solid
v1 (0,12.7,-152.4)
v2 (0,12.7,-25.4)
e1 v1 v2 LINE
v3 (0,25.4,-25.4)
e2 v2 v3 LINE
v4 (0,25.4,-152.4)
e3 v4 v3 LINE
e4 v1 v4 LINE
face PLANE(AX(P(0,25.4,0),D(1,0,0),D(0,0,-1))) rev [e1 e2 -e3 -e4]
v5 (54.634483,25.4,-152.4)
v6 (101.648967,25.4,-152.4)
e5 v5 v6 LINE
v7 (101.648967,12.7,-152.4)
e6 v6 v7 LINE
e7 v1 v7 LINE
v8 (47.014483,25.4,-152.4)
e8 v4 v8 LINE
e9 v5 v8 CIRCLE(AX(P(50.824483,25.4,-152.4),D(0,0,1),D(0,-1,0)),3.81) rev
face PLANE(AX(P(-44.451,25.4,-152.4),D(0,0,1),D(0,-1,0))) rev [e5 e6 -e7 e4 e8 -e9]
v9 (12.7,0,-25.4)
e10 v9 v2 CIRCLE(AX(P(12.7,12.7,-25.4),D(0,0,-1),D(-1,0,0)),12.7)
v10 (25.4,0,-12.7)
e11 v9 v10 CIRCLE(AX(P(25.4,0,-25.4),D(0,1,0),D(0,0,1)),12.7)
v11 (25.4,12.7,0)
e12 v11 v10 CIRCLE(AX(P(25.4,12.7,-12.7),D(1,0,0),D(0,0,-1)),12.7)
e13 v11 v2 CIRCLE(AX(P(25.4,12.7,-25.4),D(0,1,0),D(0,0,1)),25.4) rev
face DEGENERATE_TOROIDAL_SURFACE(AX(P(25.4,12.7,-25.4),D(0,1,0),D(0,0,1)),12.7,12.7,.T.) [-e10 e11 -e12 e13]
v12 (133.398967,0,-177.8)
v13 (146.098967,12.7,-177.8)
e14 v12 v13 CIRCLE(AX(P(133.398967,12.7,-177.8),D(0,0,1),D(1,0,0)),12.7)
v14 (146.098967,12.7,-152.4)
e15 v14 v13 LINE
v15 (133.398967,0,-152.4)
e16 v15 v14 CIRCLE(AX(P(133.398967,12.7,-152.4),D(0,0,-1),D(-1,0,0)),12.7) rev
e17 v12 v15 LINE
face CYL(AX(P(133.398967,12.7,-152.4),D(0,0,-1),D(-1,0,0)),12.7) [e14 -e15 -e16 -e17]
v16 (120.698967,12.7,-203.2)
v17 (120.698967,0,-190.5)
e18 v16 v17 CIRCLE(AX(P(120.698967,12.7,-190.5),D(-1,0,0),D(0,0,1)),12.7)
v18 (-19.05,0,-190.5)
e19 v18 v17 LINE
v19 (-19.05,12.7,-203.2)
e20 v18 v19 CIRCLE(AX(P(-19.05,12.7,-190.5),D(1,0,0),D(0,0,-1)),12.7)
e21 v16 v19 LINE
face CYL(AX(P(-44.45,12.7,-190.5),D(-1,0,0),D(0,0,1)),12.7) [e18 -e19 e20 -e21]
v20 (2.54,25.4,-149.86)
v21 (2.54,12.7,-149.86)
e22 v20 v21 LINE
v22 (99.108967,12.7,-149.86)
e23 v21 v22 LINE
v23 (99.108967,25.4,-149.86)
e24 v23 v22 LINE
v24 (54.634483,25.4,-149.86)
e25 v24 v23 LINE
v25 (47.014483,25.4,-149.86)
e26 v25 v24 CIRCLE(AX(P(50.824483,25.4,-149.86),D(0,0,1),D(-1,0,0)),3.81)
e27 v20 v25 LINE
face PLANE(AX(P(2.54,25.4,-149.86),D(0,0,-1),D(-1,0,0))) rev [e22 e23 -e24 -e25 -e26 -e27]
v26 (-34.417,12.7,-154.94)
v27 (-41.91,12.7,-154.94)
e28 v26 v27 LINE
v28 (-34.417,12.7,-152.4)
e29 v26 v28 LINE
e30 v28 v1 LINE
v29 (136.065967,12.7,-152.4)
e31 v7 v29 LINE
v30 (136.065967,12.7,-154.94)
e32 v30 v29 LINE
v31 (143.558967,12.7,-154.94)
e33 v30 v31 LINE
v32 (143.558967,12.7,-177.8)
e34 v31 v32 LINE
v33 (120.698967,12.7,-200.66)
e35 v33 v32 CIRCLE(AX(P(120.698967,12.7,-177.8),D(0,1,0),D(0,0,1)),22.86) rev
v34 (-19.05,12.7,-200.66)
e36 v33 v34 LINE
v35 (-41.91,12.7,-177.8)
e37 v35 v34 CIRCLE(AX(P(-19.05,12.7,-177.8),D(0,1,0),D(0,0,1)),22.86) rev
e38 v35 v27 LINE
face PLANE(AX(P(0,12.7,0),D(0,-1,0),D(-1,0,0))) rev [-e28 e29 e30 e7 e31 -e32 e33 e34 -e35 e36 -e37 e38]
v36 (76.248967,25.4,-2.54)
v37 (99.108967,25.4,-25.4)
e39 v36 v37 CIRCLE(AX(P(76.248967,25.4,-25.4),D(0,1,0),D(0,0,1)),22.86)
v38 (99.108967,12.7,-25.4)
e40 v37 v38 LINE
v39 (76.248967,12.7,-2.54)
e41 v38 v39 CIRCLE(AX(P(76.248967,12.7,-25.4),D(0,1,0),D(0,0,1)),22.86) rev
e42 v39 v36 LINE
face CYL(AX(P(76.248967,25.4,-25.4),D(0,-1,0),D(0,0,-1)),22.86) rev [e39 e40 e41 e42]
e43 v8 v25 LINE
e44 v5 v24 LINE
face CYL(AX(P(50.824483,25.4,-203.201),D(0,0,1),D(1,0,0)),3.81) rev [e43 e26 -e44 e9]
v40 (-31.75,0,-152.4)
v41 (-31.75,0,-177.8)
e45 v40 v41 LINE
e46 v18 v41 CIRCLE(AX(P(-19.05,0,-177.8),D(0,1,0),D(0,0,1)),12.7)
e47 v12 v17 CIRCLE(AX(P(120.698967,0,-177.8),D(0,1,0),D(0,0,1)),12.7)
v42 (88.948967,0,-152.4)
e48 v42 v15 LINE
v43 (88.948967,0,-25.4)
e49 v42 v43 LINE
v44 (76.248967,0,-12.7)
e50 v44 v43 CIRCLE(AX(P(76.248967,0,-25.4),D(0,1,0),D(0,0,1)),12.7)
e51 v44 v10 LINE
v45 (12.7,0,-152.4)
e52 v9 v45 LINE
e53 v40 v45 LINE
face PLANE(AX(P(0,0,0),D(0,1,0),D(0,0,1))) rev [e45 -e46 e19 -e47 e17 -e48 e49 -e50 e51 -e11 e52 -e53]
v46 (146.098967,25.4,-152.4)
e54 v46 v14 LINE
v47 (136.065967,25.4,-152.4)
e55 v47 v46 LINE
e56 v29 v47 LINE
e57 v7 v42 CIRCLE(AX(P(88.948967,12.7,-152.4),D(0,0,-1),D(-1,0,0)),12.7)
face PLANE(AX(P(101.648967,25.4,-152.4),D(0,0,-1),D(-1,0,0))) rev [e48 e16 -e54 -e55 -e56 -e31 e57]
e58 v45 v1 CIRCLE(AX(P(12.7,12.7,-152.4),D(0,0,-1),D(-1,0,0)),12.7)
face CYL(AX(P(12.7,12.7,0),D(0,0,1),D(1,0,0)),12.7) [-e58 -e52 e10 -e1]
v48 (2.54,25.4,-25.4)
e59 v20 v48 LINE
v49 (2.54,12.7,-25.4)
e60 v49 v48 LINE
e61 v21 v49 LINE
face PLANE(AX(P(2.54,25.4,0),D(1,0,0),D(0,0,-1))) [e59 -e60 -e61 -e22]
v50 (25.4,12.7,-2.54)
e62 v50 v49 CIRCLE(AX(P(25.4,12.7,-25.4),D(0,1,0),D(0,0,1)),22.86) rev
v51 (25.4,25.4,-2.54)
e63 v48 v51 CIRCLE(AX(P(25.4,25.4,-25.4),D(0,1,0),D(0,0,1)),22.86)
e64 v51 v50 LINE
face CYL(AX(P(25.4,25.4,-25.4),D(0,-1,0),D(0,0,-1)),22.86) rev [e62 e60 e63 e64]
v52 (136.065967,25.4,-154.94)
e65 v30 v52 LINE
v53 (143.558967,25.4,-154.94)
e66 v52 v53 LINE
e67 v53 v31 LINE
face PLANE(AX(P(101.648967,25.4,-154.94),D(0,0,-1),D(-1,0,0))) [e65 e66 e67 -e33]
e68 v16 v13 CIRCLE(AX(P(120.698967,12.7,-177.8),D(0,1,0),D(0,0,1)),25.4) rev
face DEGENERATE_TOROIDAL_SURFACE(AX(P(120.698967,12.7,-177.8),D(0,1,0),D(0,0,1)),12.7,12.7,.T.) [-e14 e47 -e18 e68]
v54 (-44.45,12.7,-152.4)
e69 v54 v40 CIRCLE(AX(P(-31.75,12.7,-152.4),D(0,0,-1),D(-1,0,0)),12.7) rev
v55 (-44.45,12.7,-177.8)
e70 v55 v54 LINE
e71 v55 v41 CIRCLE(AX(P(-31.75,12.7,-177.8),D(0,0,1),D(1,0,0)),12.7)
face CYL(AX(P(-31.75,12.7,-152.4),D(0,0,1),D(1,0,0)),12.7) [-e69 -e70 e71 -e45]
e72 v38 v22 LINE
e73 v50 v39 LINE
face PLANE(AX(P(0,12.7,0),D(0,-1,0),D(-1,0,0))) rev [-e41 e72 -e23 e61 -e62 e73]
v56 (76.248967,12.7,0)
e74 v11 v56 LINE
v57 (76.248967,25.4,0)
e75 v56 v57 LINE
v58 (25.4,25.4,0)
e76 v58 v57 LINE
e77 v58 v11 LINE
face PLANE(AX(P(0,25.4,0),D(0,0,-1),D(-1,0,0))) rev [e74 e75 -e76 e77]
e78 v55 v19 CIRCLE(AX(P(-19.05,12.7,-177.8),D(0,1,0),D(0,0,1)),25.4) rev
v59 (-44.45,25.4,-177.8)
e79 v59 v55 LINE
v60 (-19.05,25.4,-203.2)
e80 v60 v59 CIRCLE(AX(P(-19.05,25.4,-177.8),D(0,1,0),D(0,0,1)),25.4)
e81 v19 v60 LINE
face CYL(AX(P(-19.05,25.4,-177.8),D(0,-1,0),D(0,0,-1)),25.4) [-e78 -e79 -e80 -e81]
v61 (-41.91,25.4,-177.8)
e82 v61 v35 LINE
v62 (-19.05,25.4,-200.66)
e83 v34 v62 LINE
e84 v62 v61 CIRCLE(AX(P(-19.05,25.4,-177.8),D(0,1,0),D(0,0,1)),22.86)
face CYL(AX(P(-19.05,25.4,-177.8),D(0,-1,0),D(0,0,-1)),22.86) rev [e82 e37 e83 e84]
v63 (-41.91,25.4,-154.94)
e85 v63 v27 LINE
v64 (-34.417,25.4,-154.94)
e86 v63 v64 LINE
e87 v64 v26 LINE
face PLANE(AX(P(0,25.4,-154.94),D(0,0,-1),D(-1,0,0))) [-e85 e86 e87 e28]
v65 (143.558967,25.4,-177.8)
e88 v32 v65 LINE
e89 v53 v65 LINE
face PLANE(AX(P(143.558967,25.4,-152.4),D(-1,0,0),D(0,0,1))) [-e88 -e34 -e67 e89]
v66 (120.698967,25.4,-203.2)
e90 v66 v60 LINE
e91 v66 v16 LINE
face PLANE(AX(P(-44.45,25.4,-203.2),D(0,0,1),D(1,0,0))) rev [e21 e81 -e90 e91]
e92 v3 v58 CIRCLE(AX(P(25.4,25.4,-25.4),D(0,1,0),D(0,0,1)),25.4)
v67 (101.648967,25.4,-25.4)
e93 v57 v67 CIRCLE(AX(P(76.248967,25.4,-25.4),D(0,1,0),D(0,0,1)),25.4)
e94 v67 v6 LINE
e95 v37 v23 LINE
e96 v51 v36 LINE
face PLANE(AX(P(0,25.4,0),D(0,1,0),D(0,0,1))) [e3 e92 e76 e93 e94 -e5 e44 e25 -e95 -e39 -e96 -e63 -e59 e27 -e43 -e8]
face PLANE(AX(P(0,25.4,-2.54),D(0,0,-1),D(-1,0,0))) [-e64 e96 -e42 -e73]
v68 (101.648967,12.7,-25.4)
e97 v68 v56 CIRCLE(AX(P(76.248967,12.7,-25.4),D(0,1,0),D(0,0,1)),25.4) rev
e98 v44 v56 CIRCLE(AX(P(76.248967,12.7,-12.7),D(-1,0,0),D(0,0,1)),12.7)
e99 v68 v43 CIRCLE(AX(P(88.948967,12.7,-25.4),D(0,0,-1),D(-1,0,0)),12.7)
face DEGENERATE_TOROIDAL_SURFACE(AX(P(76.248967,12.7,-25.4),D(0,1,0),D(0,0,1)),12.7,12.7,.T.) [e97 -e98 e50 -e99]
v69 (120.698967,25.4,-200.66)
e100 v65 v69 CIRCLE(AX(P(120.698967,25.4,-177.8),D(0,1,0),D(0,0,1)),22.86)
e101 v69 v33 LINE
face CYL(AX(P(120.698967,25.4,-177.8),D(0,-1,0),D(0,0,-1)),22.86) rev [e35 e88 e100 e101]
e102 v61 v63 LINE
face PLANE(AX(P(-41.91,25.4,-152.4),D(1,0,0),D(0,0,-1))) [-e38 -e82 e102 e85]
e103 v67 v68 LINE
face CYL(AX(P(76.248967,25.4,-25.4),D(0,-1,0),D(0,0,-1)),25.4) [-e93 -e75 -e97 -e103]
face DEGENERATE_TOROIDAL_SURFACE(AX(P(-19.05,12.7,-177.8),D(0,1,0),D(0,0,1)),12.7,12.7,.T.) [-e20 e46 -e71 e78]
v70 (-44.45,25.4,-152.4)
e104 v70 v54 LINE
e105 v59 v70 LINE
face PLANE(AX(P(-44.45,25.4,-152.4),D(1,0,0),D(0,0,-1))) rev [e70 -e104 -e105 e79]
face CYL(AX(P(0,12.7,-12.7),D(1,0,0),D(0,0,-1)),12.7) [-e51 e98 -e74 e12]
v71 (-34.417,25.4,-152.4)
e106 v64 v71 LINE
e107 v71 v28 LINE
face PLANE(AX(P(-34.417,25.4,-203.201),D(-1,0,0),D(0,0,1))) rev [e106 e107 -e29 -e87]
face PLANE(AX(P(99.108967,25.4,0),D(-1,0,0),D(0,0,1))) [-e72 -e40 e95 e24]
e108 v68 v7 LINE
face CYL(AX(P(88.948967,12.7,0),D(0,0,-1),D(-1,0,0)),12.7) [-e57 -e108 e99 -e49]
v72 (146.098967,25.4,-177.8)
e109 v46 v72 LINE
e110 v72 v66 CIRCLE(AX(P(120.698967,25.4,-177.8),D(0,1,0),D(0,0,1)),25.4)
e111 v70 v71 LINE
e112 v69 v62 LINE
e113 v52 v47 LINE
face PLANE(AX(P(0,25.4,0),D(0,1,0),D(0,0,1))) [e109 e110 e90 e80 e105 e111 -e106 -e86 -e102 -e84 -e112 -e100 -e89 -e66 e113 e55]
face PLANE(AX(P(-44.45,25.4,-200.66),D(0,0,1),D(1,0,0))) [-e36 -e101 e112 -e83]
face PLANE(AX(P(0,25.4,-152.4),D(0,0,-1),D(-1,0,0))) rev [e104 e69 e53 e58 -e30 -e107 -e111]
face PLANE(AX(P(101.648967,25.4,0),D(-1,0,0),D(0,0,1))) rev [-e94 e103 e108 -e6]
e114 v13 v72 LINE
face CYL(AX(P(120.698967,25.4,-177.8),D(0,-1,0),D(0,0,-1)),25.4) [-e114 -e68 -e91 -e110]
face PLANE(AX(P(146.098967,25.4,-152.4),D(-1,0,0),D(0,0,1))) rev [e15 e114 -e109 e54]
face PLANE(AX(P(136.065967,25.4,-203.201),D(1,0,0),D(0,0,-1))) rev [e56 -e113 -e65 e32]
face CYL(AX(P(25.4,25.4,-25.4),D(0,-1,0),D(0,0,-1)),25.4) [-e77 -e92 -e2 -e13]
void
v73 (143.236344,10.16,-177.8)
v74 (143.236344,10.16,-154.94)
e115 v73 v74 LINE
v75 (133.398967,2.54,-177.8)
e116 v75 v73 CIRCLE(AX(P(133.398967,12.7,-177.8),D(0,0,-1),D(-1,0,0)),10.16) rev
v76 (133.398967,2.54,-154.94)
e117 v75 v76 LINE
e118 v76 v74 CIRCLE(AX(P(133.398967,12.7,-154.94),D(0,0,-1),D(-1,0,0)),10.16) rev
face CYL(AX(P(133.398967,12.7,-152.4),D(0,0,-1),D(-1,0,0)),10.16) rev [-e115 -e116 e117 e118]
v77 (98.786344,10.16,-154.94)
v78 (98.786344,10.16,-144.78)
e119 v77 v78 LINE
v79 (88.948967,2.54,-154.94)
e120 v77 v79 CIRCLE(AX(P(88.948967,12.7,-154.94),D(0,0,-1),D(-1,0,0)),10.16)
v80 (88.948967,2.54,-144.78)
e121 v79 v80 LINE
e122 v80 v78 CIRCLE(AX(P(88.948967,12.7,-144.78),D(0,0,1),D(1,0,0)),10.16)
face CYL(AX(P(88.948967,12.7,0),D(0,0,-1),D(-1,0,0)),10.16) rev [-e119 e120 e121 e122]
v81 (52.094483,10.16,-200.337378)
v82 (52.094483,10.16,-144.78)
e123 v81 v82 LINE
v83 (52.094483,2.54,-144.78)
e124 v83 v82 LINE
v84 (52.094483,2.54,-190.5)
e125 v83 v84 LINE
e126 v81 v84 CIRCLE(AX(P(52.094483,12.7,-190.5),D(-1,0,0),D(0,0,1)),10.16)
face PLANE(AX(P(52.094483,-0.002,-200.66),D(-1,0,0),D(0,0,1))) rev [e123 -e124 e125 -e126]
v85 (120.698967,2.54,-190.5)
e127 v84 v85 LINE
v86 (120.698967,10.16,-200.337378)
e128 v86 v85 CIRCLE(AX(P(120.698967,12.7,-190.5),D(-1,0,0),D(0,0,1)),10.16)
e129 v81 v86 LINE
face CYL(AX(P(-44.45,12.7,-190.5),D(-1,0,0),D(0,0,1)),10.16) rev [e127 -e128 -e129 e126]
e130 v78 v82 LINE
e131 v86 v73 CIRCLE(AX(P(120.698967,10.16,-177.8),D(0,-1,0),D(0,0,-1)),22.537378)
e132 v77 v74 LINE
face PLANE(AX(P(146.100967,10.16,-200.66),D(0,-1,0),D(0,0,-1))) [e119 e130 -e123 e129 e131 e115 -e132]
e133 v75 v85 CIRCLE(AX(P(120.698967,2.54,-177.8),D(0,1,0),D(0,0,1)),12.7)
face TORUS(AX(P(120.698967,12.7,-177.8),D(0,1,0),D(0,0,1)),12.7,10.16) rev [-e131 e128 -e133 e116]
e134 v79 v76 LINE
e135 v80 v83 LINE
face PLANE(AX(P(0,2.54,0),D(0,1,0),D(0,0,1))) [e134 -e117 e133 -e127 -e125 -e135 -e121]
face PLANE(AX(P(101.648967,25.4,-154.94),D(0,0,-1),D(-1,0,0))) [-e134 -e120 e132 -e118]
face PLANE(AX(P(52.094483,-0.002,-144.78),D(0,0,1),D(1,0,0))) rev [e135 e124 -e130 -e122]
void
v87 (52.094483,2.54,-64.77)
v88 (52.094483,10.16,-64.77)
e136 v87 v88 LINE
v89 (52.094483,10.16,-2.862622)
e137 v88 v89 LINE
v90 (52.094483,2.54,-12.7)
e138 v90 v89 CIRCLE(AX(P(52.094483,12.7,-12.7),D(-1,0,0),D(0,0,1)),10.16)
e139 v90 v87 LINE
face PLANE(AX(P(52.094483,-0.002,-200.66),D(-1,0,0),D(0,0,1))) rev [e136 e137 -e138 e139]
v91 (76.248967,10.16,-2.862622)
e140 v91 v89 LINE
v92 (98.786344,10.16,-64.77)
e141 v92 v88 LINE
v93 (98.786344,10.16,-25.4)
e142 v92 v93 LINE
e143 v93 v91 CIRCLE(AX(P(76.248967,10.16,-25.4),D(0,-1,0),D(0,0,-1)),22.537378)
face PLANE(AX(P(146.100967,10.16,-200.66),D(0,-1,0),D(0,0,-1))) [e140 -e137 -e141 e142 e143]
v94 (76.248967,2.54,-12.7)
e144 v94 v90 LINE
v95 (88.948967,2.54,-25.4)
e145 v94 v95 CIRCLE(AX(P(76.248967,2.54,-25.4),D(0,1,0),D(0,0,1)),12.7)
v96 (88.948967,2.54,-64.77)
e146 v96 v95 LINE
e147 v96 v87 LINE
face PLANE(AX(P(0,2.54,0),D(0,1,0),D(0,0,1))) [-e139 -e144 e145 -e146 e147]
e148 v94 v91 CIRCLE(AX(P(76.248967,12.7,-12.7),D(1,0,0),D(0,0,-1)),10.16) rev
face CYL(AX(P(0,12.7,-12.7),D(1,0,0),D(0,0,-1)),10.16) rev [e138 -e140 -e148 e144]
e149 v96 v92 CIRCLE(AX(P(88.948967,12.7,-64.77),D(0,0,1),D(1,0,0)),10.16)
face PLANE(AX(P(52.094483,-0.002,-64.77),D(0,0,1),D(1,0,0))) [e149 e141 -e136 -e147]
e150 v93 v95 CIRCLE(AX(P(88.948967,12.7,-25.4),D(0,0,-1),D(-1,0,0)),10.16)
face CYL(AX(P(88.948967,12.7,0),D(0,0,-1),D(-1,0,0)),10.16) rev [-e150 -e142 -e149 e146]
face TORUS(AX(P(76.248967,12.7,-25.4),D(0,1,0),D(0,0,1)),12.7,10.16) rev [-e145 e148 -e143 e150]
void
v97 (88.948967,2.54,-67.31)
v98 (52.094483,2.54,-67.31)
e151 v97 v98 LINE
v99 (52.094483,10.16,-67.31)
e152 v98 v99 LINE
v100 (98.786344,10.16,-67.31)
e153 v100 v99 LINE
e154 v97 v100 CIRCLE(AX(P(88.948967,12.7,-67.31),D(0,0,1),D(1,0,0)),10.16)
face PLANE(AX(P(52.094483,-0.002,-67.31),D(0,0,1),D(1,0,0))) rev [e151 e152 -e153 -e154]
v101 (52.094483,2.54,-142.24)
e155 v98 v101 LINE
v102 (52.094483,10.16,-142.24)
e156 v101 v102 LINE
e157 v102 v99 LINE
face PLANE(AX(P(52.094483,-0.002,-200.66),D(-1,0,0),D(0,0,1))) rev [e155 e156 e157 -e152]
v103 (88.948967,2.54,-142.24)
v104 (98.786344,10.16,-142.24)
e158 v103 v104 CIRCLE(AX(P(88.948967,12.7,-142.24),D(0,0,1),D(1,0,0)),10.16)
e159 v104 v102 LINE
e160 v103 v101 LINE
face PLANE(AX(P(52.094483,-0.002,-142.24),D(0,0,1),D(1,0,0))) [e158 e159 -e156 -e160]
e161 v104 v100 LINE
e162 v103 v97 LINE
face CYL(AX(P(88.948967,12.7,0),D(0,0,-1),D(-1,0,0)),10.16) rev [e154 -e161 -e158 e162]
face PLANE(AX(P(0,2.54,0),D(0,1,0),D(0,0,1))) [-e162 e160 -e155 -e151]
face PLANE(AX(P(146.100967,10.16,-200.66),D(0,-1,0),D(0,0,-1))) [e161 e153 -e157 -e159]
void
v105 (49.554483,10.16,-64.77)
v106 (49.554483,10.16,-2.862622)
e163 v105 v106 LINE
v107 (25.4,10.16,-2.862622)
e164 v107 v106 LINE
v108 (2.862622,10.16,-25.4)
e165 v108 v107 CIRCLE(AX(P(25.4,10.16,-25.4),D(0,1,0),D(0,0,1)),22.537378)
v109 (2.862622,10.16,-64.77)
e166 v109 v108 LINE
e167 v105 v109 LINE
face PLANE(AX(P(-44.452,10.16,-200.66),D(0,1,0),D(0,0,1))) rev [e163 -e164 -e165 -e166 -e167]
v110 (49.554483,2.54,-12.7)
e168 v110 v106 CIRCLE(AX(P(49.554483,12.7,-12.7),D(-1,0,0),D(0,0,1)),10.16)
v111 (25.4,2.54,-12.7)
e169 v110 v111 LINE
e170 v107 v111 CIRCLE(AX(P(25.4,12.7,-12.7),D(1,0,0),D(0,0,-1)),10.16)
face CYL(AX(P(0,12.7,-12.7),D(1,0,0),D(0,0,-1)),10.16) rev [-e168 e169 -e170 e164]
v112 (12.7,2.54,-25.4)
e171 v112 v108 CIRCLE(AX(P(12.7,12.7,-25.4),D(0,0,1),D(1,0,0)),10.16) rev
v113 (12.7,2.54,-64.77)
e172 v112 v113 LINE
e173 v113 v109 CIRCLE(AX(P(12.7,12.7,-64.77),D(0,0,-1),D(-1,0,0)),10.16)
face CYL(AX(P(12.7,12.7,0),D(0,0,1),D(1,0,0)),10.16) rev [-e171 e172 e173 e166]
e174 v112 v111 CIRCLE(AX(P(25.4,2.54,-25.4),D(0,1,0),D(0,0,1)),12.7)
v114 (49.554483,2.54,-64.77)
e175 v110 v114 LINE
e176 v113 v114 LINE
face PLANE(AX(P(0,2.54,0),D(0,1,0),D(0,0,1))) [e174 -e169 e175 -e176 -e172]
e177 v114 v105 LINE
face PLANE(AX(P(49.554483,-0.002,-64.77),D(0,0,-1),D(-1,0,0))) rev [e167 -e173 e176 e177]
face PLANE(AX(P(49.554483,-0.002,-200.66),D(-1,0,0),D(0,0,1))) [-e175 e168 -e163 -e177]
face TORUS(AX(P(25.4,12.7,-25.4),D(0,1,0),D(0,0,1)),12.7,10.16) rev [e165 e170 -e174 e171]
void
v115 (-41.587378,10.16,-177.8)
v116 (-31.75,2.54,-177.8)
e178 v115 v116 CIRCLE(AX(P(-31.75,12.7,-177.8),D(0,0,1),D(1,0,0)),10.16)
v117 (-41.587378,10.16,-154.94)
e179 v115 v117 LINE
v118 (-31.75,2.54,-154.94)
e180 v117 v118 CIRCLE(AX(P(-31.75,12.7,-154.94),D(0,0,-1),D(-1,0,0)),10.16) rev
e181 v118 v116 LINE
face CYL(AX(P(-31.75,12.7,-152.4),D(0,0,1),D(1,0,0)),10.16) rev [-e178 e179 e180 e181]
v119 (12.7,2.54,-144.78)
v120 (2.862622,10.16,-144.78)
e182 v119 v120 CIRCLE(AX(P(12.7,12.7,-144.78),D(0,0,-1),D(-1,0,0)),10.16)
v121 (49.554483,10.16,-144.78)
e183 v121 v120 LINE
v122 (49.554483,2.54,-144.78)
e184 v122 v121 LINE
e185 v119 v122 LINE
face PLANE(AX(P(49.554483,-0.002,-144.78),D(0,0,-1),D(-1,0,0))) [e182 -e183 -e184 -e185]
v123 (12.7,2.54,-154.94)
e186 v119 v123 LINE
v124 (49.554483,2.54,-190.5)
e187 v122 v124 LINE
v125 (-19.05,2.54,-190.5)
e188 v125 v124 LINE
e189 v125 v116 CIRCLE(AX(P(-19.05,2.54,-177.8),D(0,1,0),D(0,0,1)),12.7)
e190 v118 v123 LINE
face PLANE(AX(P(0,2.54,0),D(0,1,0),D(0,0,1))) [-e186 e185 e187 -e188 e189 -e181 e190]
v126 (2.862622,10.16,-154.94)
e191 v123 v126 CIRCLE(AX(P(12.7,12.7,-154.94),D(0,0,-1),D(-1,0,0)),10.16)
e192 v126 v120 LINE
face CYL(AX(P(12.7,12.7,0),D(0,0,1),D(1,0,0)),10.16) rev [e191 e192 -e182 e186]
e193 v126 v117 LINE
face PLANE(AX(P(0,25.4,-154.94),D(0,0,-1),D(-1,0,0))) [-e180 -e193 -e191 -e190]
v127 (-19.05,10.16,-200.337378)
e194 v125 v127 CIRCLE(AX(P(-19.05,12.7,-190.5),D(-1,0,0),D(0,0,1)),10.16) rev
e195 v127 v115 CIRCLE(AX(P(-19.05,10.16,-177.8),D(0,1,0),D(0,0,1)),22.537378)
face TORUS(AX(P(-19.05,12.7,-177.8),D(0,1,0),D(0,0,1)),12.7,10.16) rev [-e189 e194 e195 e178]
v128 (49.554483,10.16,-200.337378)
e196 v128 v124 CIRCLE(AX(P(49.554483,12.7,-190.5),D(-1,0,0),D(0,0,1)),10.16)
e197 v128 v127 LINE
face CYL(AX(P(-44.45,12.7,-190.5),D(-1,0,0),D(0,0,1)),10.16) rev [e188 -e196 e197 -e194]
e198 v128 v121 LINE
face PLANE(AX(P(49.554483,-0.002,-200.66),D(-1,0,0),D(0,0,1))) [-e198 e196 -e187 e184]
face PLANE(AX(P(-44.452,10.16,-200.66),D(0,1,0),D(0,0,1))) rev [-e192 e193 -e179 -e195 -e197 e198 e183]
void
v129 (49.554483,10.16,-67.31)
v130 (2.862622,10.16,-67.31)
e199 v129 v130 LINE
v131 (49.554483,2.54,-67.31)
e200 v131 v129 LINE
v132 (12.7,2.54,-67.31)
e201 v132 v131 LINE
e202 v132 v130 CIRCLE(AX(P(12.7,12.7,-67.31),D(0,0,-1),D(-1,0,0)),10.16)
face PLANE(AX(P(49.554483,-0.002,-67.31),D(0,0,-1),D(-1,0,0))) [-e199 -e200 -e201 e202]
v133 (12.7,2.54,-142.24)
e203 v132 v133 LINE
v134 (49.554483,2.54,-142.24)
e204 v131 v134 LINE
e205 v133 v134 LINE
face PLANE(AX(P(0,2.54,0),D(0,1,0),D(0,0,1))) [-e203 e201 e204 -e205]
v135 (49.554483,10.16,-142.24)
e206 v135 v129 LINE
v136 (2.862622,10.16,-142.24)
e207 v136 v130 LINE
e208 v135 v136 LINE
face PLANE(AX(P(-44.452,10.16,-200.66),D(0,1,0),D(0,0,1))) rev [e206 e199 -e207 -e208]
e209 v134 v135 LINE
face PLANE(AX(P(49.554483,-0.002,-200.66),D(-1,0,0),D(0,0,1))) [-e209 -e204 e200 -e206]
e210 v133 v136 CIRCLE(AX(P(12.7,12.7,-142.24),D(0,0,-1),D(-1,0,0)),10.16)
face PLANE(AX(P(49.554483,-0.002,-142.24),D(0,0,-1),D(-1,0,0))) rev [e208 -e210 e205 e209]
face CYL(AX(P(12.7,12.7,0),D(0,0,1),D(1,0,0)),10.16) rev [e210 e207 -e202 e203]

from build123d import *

# Parameters (mm, degrees)
BOSS_EXTRUDE1_DEPTH  = 25.4
FILLET1_R            = 12.7
FILLET3_R            = 25.4
FILLET4_R            = 25.4
FILLET5_R            = 25.4
SHELL1_T             = -2.54
EXTRUDE_THIN1_REACH  = 252.592
SKETCH2_W            = 2.54
SKETCH2_H            = 198.12
EXTRUDE_THIN4_REACH  = 252.592
SKETCH3_W            = 47.014483258
SKETCH3_H            = 2.54
SKETCH3_W_2          = 47.014483257
EXTRUDE_THIN5_REACH  = 252.592
SKETCH5_W            = 47.014483258
SKETCH5_H            = 2.54
SKETCH5_W_2          = 47.014483257
EXTRUDE_THIN10_START = 10.16
EXTRUDE_THIN10_DEPTH = 2.54
EXTRUDE_THIN11_START = 10.16
EXTRUDE_THIN11_DEPTH = 2.54
CUT_EXTRUDE2_REACH   = 214.64
SKETCH11_W           = 34.417
SKETCH11_H           = 12.7
CUT_EXTRUDE3_REACH   = 253.556
SKETCH12_W           = 2.54
SKETCH12_H           = 12.7
CUT_EXTRUDE4_REACH   = 253.556
SKETCH13_W           = 2.54
SKETCH13_H           = 12.7
SKETCH14_W           = 96.568966515
SKETCH14_H           = 2.54
EXTRUDE_THIN13_DEPTH = 12.7
CUT_EXTRUDE6_REACH   = 212.827


with BuildPart() as part:
    # Sketch1 → Boss-Extrude1 (new body)
    with BuildSketch(Plane(origin=(0, 0, 0), x_dir=(1, 0, 0), z_dir=(0, 1, 0))):
        Polygon((0, 0), (0, 152.4), (-44.45, 152.4), (-44.45, 203.2), (146.098966515, 203.2), (146.098966515, 152.4), (101.648966515, 152.4), (101.648966515, 0), align=None)
    extrude(amount=BOSS_EXTRUDE1_DEPTH)

    # Fillet1
    fillet1_edges = [part.edges().sort_by_distance(p)[0] for p in [
        (146.098966515, 0, -177.8),
        (101.648966515, 0, -76.2),
        (50.824483258, 0, 0),
        (0, 0, -76.2),
        (-44.45, 0, -177.8),
        (50.824483258, 0, -203.2),
    ]]
    fillet(fillet1_edges, radius=FILLET1_R)

    # Fillet3
    # the kernel refuses this fillet: 25.4 mm, written as the material it takes off along each edge
    with BuildSketch(Plane(origin=(76.248966515, 0, -25.4), x_dir=(1, 0, 0), z_dir=(0, 0, -1))) as fillet3_piece_1:
        with BuildLine():
            CenterArc((12.7, -12.7), 12.7, 0, 90)
            Line((25.4, -12.7), (25.4, 0))
            Line((25.4, 0), (12.7, 0))
        make_face()
    revolve(axis=Axis((76.248966515, 0, -25.4), (0, -1, 0)), revolution_arc=90, mode=Mode.SUBTRACT)
    with BuildSketch(Plane(origin=(101.648966515, 0, 0), x_dir=(0, 0, -1), z_dir=(0, 1, 0))) as fillet3_piece_2:
        with BuildLine():
            CenterArc((FILLET3_R, FILLET3_R), FILLET3_R, 180, 90)
            Line((0, FILLET3_R), (0, 0))
            Line((0, 0), (FILLET3_R, 0))
        make_face()
    extrude(amount=88.9, mode=Mode.SUBTRACT)

    # Fillet4
    # the kernel refuses this fillet: 25.4 mm, written as the material it takes off along each edge
    with BuildSketch(Plane(origin=(25.4, 0, -25.4), x_dir=(0, 0, 1), z_dir=(1, 0, 0))) as fillet4_piece_1:
        with BuildLine():
            CenterArc((12.7, -12.7), 12.7, 0, 90)
            Line((25.4, -12.7), (25.4, 0))
            Line((25.4, 0), (12.7, 0))
        make_face()
    revolve(axis=Axis((25.4, 0, -25.4), (0, -1, 0)), revolution_arc=90, mode=Mode.SUBTRACT)
    with BuildSketch(Plane(origin=(0, 0, 0), x_dir=(0, 0, -1), z_dir=(0, 1, 0))) as fillet4_piece_2:
        with BuildLine():
            CenterArc((FILLET4_R, -FILLET4_R), FILLET4_R, 90, 90)
            Line((0, -FILLET4_R), (0, 0))
            Line((0, 0), (FILLET4_R, 0))
        make_face()
    extrude(amount=88.9, mode=Mode.SUBTRACT)

    # Fillet5
    # the kernel refuses this fillet: 25.4 mm, written as the material it takes off along each edge
    with BuildSketch(Plane(origin=(120.698966515, 0, -177.8), x_dir=(0, 0, -1), z_dir=(-1, 0, 0))) as fillet5_piece_1:
        with BuildLine():
            CenterArc((12.7, -12.7), 12.7, 0, 90)
            Line((25.4, -12.7), (25.4, 0))
            Line((25.4, 0), (12.7, 0))
        make_face()
    revolve(axis=Axis((120.698966515, 0, -177.8), (0, -1, 0)), revolution_arc=90, mode=Mode.SUBTRACT)
    with BuildSketch(Plane(origin=(-19.05, 0, -177.8), x_dir=(-1, 0, 0), z_dir=(0, 0, 1))) as fillet5_piece_2:
        with BuildLine():
            CenterArc((12.7, -12.7), 12.7, 0, 90)
            Line((25.4, -12.7), (25.4, 0))
            Line((25.4, 0), (12.7, 0))
        make_face()
    revolve(axis=Axis((-19.05, 0, -177.8), (0, -1, 0)), revolution_arc=90, mode=Mode.SUBTRACT)
    with BuildSketch(Plane(origin=(-44.45, 0, -203.2), x_dir=(0, 0, 1), z_dir=(0, 1, 0))) as fillet5_piece_3:
        with BuildLine():
            CenterArc((FILLET5_R, FILLET5_R), FILLET5_R, 180, 90)
            Line((0, FILLET5_R), (0, 0))
            Line((0, 0), (FILLET5_R, 0))
        make_face()
    extrude(amount=88.9, mode=Mode.SUBTRACT)
    with BuildSketch(Plane(origin=(146.098966515, 0, -203.2), x_dir=(0, 0, 1), z_dir=(0, 1, 0))) as fillet5_piece_4:
        with BuildLine():
            CenterArc((FILLET5_R, -FILLET5_R), FILLET5_R, 90, 90)
            Line((0, -FILLET5_R), (0, 0))
            Line((0, 0), (FILLET5_R, 0))
        make_face()
    extrude(amount=88.9, mode=Mode.SUBTRACT)

    # Shell1
    shell1_openings = [part.faces().sort_by_distance(p)[0] for p in [
        (50.824483258, 25.4, -115.579080846),
    ]]
    offset(amount=SHELL1_T, openings=shell1_openings, kind=Kind.INTERSECTION)

    # Sketch2 → Extrude-Thin1 (add, up to next)
    with BuildSketch(Plane(origin=(0, 12.7, 0), x_dir=(1, 0, 0), z_dir=(0, 1, 0)), mode=Mode.PRIVATE) as extrude_thin1_sk1:
        with Locations((50.824483258, 101.6)):
            Rectangle(SKETCH2_W, SKETCH2_H)
    extrude_thin1_tool1 = extrude(extrude_thin1_sk1.sketch, amount=-EXTRUDE_THIN1_REACH, mode=Mode.PRIVATE) - part.part
    add(extrude_thin1_tool1.solids().sort_by_distance((50.824483, 12.7, -101.6))[0])

    # Sketch3 → Extrude-Thin4 (add, up to next)
    with BuildSketch(Plane(origin=(0, 12.7, 0), x_dir=(1, 0, 0), z_dir=(0, 1, 0)), mode=Mode.PRIVATE) as extrude_thin4_sk1:
        with Locations((26.047241629, 66.04)):
            Rectangle(SKETCH3_W, SKETCH3_H)
    extrude_thin4_tool1 = extrude(extrude_thin4_sk1.sketch, amount=-EXTRUDE_THIN4_REACH, mode=Mode.PRIVATE) - part.part
    # Sketch3 → Extrude-Thin4 (add, up to next)
    with BuildSketch(Plane(origin=(0, 12.7, 0), x_dir=(1, 0, 0), z_dir=(0, 1, 0)), mode=Mode.PRIVATE) as extrude_thin4_sk2:
        with Locations((75.601724887, 66.04)):
            Rectangle(SKETCH3_W_2, SKETCH3_H)
    extrude_thin4_tool2 = extrude(extrude_thin4_sk2.sketch, amount=-EXTRUDE_THIN4_REACH, mode=Mode.PRIVATE) - part.part
    add(extrude_thin4_tool1.solids().sort_by_distance((26.047242, 12.7, -66.04))[0])
    add(extrude_thin4_tool2.solids().sort_by_distance((75.601725, 12.7, -66.04))[0])

    # Sketch5 → Extrude-Thin5 (add, up to next)
    with BuildSketch(Plane(origin=(0, 12.7, 0), x_dir=(1, 0, 0), z_dir=(0, 1, 0)), mode=Mode.PRIVATE) as extrude_thin5_sk1:
        with Locations((26.047241629, 143.51)):
            Rectangle(SKETCH5_W, SKETCH5_H)
    extrude_thin5_tool1 = extrude(extrude_thin5_sk1.sketch, amount=-EXTRUDE_THIN5_REACH, mode=Mode.PRIVATE) - part.part
    # Sketch5 → Extrude-Thin5 (add, up to next)
    with BuildSketch(Plane(origin=(0, 12.7, 0), x_dir=(1, 0, 0), z_dir=(0, 1, 0)), mode=Mode.PRIVATE) as extrude_thin5_sk2:
        with Locations((75.601724887, 143.51)):
            Rectangle(SKETCH5_W_2, SKETCH5_H)
    extrude_thin5_tool2 = extrude(extrude_thin5_sk2.sketch, amount=-EXTRUDE_THIN5_REACH, mode=Mode.PRIVATE) - part.part
    add(extrude_thin5_tool1.solids().sort_by_distance((26.047242, 12.7, -143.51))[0])
    add(extrude_thin5_tool2.solids().sort_by_distance((75.601725, 12.7, -143.51))[0])

    # Extrude-Thin10: read off the stored shape, not the designer's step
    # Extrude-Thin10 outline → Extrude-Thin10 (add)
    with BuildSketch(Plane(origin=(0, 0, 0), x_dir=(1, 0, 0), z_dir=(0, 1, 0)).offset(EXTRUDE_THIN10_START)):
        with BuildLine():
            ThreePointArc((2.54, 25.4), (9.235538982, 9.235538982), (25.4, 2.54))
            Line((25.4, 2.54), (52.094483258, 2.54))
            Line((52.094483258, 2.54), (52.094483258, 64.77))
            Line((52.094483258, 64.77), (99.108966515, 64.77))
            Line((99.108966515, 64.77), (99.108966515, 67.31))
            Line((99.108966515, 67.31), (52.094483258, 67.31))
            Line((52.094483258, 67.31), (52.094483258, 142.24))
            Line((52.094483258, 142.24), (99.108966515, 142.24))
            Line((99.108966515, 142.24), (99.108966515, 144.78))
            Line((99.108966515, 144.78), (52.094483258, 144.78))
            Line((52.094483258, 144.78), (52.094483258, 200.66))
            Line((52.094483258, 200.66), (-19.05, 200.66))
            ThreePointArc((-19.05, 200.66), (-35.214461018, 193.964461018), (-41.91, 177.8))
            Line((-41.91, 177.8), (-41.91, 154.94))
            Line((-41.91, 154.94), (2.54, 154.94))
            Line((2.54, 154.94), (2.54, 25.4))
        make_face()
    extrude(amount=EXTRUDE_THIN10_DEPTH)

    # Extrude-Thin11: read off the stored shape, not the designer's step
    # Extrude-Thin11 outline → Extrude-Thin11 (add)
    with BuildSketch(Plane(origin=(0, 0, 0), x_dir=(1, 0, 0), z_dir=(0, 1, 0)).offset(EXTRUDE_THIN11_START)):
        with BuildLine():
            ThreePointArc((2.54, 25.4), (9.235538982, 9.235538982), (25.4, 2.54))
            Line((25.4, 2.54), (76.248966515, 2.54))
            ThreePointArc((76.248966515, 2.54), (92.413427533, 9.235538982), (99.108966515, 25.4))
            Line((99.108966515, 25.4), (99.108966515, 154.94))
            Line((99.108966515, 154.94), (143.558966515, 154.94))
            Line((143.558966515, 154.94), (143.558966515, 177.8))
            ThreePointArc((143.558966515, 177.8), (136.863427533, 193.964461018), (120.698966515, 200.66))
            Line((120.698966515, 200.66), (-19.05, 200.66))
            ThreePointArc((-19.05, 200.66), (-35.214461018, 193.964461018), (-41.91, 177.8))
            Line((-41.91, 177.8), (-41.91, 154.94))
            Line((-41.91, 154.94), (2.54, 154.94))
            Line((2.54, 154.94), (2.54, 25.4))
        make_face()
    extrude(amount=EXTRUDE_THIN11_DEPTH)

    # Sketch11 → Cut-Extrude2 (cut, up to next)
    with BuildSketch(Plane.XY.offset(-152.4), mode=Mode.PRIVATE) as cut_extrude2_sk1:
        with Locations((-17.2085, 19.05)):
            Rectangle(SKETCH11_W, SKETCH11_H)
    cut_extrude2_tool1 = extrude(cut_extrude2_sk1.sketch, amount=-CUT_EXTRUDE2_REACH, mode=Mode.PRIVATE) & part.part
    # Sketch11 → Cut-Extrude2 (cut, up to next)
    with BuildSketch(Plane.XY.offset(-152.4), mode=Mode.PRIVATE) as cut_extrude2_sk2:
        with Locations((118.857466515, 19.05)):
            Rectangle(SKETCH11_W, SKETCH11_H)
    cut_extrude2_tool2 = extrude(cut_extrude2_sk2.sketch, amount=-CUT_EXTRUDE2_REACH, mode=Mode.PRIVATE) & part.part
    add(cut_extrude2_tool1.solids().sort_by_distance((-17.2085, 19.05, -152.4))[0], mode=Mode.SUBTRACT)
    add(cut_extrude2_tool2.solids().sort_by_distance((118.857467, 19.05, -152.4))[0], mode=Mode.SUBTRACT)

    # Sketch12 → Cut-Extrude3 (cut, up to next)
    with BuildSketch(Plane(origin=(101.648966515, 0, 0), x_dir=(0, 0, -1), z_dir=(1, 0, 0)), mode=Mode.PRIVATE) as cut_extrude3_sk1:
        with Locations((153.67, 19.05)):
            Rectangle(SKETCH12_W, SKETCH12_H)
    cut_extrude3_tool1 = extrude(cut_extrude3_sk1.sketch, amount=-CUT_EXTRUDE3_REACH, mode=Mode.PRIVATE) & part.part
    add(cut_extrude3_tool1.solids().sort_by_distance((101.648967, 19.05, -153.67))[0], mode=Mode.SUBTRACT)

    # Sketch13 → Cut-Extrude4 (cut, up to next)
    with BuildSketch(Plane.ZY, mode=Mode.PRIVATE) as cut_extrude4_sk1:
        with Locations((-153.67, 19.05)):
            Rectangle(SKETCH13_W, SKETCH13_H)
    cut_extrude4_tool1 = extrude(cut_extrude4_sk1.sketch, amount=-CUT_EXTRUDE4_REACH, mode=Mode.PRIVATE) & part.part
    add(cut_extrude4_tool1.solids().sort_by_distance((0, 19.05, -153.67))[0], mode=Mode.SUBTRACT)

    # Sketch14 → Extrude-Thin13 (add)
    with BuildSketch(Plane(origin=(0, 12.7, 0), x_dir=(1, 0, 0), z_dir=(0, 1, 0))):
        with Locations((50.824483258, 151.13)):
            Rectangle(SKETCH14_W, SKETCH14_H)
    extrude(amount=EXTRUDE_THIN13_DEPTH)

    # Sketch16 → Cut-Extrude6 (cut, up to next)
    with BuildSketch(Plane.XY.offset(-149.86), mode=Mode.PRIVATE) as cut_extrude6_sk1:
        with BuildLine():
            Line((47.014483258, 25.4), (54.634483258, 25.4))
            ThreePointArc((54.634483258, 25.4), (50.824483258, 21.59), (47.014483258, 25.4))
        make_face()
    cut_extrude6_tool1 = extrude(cut_extrude6_sk1.sketch, amount=-CUT_EXTRUDE6_REACH, mode=Mode.PRIVATE) & part.part
    add(cut_extrude6_tool1.solids().sort_by_distance((50.824483, 23.782986, -149.86))[0], mode=Mode.SUBTRACT)


solid = part.part
